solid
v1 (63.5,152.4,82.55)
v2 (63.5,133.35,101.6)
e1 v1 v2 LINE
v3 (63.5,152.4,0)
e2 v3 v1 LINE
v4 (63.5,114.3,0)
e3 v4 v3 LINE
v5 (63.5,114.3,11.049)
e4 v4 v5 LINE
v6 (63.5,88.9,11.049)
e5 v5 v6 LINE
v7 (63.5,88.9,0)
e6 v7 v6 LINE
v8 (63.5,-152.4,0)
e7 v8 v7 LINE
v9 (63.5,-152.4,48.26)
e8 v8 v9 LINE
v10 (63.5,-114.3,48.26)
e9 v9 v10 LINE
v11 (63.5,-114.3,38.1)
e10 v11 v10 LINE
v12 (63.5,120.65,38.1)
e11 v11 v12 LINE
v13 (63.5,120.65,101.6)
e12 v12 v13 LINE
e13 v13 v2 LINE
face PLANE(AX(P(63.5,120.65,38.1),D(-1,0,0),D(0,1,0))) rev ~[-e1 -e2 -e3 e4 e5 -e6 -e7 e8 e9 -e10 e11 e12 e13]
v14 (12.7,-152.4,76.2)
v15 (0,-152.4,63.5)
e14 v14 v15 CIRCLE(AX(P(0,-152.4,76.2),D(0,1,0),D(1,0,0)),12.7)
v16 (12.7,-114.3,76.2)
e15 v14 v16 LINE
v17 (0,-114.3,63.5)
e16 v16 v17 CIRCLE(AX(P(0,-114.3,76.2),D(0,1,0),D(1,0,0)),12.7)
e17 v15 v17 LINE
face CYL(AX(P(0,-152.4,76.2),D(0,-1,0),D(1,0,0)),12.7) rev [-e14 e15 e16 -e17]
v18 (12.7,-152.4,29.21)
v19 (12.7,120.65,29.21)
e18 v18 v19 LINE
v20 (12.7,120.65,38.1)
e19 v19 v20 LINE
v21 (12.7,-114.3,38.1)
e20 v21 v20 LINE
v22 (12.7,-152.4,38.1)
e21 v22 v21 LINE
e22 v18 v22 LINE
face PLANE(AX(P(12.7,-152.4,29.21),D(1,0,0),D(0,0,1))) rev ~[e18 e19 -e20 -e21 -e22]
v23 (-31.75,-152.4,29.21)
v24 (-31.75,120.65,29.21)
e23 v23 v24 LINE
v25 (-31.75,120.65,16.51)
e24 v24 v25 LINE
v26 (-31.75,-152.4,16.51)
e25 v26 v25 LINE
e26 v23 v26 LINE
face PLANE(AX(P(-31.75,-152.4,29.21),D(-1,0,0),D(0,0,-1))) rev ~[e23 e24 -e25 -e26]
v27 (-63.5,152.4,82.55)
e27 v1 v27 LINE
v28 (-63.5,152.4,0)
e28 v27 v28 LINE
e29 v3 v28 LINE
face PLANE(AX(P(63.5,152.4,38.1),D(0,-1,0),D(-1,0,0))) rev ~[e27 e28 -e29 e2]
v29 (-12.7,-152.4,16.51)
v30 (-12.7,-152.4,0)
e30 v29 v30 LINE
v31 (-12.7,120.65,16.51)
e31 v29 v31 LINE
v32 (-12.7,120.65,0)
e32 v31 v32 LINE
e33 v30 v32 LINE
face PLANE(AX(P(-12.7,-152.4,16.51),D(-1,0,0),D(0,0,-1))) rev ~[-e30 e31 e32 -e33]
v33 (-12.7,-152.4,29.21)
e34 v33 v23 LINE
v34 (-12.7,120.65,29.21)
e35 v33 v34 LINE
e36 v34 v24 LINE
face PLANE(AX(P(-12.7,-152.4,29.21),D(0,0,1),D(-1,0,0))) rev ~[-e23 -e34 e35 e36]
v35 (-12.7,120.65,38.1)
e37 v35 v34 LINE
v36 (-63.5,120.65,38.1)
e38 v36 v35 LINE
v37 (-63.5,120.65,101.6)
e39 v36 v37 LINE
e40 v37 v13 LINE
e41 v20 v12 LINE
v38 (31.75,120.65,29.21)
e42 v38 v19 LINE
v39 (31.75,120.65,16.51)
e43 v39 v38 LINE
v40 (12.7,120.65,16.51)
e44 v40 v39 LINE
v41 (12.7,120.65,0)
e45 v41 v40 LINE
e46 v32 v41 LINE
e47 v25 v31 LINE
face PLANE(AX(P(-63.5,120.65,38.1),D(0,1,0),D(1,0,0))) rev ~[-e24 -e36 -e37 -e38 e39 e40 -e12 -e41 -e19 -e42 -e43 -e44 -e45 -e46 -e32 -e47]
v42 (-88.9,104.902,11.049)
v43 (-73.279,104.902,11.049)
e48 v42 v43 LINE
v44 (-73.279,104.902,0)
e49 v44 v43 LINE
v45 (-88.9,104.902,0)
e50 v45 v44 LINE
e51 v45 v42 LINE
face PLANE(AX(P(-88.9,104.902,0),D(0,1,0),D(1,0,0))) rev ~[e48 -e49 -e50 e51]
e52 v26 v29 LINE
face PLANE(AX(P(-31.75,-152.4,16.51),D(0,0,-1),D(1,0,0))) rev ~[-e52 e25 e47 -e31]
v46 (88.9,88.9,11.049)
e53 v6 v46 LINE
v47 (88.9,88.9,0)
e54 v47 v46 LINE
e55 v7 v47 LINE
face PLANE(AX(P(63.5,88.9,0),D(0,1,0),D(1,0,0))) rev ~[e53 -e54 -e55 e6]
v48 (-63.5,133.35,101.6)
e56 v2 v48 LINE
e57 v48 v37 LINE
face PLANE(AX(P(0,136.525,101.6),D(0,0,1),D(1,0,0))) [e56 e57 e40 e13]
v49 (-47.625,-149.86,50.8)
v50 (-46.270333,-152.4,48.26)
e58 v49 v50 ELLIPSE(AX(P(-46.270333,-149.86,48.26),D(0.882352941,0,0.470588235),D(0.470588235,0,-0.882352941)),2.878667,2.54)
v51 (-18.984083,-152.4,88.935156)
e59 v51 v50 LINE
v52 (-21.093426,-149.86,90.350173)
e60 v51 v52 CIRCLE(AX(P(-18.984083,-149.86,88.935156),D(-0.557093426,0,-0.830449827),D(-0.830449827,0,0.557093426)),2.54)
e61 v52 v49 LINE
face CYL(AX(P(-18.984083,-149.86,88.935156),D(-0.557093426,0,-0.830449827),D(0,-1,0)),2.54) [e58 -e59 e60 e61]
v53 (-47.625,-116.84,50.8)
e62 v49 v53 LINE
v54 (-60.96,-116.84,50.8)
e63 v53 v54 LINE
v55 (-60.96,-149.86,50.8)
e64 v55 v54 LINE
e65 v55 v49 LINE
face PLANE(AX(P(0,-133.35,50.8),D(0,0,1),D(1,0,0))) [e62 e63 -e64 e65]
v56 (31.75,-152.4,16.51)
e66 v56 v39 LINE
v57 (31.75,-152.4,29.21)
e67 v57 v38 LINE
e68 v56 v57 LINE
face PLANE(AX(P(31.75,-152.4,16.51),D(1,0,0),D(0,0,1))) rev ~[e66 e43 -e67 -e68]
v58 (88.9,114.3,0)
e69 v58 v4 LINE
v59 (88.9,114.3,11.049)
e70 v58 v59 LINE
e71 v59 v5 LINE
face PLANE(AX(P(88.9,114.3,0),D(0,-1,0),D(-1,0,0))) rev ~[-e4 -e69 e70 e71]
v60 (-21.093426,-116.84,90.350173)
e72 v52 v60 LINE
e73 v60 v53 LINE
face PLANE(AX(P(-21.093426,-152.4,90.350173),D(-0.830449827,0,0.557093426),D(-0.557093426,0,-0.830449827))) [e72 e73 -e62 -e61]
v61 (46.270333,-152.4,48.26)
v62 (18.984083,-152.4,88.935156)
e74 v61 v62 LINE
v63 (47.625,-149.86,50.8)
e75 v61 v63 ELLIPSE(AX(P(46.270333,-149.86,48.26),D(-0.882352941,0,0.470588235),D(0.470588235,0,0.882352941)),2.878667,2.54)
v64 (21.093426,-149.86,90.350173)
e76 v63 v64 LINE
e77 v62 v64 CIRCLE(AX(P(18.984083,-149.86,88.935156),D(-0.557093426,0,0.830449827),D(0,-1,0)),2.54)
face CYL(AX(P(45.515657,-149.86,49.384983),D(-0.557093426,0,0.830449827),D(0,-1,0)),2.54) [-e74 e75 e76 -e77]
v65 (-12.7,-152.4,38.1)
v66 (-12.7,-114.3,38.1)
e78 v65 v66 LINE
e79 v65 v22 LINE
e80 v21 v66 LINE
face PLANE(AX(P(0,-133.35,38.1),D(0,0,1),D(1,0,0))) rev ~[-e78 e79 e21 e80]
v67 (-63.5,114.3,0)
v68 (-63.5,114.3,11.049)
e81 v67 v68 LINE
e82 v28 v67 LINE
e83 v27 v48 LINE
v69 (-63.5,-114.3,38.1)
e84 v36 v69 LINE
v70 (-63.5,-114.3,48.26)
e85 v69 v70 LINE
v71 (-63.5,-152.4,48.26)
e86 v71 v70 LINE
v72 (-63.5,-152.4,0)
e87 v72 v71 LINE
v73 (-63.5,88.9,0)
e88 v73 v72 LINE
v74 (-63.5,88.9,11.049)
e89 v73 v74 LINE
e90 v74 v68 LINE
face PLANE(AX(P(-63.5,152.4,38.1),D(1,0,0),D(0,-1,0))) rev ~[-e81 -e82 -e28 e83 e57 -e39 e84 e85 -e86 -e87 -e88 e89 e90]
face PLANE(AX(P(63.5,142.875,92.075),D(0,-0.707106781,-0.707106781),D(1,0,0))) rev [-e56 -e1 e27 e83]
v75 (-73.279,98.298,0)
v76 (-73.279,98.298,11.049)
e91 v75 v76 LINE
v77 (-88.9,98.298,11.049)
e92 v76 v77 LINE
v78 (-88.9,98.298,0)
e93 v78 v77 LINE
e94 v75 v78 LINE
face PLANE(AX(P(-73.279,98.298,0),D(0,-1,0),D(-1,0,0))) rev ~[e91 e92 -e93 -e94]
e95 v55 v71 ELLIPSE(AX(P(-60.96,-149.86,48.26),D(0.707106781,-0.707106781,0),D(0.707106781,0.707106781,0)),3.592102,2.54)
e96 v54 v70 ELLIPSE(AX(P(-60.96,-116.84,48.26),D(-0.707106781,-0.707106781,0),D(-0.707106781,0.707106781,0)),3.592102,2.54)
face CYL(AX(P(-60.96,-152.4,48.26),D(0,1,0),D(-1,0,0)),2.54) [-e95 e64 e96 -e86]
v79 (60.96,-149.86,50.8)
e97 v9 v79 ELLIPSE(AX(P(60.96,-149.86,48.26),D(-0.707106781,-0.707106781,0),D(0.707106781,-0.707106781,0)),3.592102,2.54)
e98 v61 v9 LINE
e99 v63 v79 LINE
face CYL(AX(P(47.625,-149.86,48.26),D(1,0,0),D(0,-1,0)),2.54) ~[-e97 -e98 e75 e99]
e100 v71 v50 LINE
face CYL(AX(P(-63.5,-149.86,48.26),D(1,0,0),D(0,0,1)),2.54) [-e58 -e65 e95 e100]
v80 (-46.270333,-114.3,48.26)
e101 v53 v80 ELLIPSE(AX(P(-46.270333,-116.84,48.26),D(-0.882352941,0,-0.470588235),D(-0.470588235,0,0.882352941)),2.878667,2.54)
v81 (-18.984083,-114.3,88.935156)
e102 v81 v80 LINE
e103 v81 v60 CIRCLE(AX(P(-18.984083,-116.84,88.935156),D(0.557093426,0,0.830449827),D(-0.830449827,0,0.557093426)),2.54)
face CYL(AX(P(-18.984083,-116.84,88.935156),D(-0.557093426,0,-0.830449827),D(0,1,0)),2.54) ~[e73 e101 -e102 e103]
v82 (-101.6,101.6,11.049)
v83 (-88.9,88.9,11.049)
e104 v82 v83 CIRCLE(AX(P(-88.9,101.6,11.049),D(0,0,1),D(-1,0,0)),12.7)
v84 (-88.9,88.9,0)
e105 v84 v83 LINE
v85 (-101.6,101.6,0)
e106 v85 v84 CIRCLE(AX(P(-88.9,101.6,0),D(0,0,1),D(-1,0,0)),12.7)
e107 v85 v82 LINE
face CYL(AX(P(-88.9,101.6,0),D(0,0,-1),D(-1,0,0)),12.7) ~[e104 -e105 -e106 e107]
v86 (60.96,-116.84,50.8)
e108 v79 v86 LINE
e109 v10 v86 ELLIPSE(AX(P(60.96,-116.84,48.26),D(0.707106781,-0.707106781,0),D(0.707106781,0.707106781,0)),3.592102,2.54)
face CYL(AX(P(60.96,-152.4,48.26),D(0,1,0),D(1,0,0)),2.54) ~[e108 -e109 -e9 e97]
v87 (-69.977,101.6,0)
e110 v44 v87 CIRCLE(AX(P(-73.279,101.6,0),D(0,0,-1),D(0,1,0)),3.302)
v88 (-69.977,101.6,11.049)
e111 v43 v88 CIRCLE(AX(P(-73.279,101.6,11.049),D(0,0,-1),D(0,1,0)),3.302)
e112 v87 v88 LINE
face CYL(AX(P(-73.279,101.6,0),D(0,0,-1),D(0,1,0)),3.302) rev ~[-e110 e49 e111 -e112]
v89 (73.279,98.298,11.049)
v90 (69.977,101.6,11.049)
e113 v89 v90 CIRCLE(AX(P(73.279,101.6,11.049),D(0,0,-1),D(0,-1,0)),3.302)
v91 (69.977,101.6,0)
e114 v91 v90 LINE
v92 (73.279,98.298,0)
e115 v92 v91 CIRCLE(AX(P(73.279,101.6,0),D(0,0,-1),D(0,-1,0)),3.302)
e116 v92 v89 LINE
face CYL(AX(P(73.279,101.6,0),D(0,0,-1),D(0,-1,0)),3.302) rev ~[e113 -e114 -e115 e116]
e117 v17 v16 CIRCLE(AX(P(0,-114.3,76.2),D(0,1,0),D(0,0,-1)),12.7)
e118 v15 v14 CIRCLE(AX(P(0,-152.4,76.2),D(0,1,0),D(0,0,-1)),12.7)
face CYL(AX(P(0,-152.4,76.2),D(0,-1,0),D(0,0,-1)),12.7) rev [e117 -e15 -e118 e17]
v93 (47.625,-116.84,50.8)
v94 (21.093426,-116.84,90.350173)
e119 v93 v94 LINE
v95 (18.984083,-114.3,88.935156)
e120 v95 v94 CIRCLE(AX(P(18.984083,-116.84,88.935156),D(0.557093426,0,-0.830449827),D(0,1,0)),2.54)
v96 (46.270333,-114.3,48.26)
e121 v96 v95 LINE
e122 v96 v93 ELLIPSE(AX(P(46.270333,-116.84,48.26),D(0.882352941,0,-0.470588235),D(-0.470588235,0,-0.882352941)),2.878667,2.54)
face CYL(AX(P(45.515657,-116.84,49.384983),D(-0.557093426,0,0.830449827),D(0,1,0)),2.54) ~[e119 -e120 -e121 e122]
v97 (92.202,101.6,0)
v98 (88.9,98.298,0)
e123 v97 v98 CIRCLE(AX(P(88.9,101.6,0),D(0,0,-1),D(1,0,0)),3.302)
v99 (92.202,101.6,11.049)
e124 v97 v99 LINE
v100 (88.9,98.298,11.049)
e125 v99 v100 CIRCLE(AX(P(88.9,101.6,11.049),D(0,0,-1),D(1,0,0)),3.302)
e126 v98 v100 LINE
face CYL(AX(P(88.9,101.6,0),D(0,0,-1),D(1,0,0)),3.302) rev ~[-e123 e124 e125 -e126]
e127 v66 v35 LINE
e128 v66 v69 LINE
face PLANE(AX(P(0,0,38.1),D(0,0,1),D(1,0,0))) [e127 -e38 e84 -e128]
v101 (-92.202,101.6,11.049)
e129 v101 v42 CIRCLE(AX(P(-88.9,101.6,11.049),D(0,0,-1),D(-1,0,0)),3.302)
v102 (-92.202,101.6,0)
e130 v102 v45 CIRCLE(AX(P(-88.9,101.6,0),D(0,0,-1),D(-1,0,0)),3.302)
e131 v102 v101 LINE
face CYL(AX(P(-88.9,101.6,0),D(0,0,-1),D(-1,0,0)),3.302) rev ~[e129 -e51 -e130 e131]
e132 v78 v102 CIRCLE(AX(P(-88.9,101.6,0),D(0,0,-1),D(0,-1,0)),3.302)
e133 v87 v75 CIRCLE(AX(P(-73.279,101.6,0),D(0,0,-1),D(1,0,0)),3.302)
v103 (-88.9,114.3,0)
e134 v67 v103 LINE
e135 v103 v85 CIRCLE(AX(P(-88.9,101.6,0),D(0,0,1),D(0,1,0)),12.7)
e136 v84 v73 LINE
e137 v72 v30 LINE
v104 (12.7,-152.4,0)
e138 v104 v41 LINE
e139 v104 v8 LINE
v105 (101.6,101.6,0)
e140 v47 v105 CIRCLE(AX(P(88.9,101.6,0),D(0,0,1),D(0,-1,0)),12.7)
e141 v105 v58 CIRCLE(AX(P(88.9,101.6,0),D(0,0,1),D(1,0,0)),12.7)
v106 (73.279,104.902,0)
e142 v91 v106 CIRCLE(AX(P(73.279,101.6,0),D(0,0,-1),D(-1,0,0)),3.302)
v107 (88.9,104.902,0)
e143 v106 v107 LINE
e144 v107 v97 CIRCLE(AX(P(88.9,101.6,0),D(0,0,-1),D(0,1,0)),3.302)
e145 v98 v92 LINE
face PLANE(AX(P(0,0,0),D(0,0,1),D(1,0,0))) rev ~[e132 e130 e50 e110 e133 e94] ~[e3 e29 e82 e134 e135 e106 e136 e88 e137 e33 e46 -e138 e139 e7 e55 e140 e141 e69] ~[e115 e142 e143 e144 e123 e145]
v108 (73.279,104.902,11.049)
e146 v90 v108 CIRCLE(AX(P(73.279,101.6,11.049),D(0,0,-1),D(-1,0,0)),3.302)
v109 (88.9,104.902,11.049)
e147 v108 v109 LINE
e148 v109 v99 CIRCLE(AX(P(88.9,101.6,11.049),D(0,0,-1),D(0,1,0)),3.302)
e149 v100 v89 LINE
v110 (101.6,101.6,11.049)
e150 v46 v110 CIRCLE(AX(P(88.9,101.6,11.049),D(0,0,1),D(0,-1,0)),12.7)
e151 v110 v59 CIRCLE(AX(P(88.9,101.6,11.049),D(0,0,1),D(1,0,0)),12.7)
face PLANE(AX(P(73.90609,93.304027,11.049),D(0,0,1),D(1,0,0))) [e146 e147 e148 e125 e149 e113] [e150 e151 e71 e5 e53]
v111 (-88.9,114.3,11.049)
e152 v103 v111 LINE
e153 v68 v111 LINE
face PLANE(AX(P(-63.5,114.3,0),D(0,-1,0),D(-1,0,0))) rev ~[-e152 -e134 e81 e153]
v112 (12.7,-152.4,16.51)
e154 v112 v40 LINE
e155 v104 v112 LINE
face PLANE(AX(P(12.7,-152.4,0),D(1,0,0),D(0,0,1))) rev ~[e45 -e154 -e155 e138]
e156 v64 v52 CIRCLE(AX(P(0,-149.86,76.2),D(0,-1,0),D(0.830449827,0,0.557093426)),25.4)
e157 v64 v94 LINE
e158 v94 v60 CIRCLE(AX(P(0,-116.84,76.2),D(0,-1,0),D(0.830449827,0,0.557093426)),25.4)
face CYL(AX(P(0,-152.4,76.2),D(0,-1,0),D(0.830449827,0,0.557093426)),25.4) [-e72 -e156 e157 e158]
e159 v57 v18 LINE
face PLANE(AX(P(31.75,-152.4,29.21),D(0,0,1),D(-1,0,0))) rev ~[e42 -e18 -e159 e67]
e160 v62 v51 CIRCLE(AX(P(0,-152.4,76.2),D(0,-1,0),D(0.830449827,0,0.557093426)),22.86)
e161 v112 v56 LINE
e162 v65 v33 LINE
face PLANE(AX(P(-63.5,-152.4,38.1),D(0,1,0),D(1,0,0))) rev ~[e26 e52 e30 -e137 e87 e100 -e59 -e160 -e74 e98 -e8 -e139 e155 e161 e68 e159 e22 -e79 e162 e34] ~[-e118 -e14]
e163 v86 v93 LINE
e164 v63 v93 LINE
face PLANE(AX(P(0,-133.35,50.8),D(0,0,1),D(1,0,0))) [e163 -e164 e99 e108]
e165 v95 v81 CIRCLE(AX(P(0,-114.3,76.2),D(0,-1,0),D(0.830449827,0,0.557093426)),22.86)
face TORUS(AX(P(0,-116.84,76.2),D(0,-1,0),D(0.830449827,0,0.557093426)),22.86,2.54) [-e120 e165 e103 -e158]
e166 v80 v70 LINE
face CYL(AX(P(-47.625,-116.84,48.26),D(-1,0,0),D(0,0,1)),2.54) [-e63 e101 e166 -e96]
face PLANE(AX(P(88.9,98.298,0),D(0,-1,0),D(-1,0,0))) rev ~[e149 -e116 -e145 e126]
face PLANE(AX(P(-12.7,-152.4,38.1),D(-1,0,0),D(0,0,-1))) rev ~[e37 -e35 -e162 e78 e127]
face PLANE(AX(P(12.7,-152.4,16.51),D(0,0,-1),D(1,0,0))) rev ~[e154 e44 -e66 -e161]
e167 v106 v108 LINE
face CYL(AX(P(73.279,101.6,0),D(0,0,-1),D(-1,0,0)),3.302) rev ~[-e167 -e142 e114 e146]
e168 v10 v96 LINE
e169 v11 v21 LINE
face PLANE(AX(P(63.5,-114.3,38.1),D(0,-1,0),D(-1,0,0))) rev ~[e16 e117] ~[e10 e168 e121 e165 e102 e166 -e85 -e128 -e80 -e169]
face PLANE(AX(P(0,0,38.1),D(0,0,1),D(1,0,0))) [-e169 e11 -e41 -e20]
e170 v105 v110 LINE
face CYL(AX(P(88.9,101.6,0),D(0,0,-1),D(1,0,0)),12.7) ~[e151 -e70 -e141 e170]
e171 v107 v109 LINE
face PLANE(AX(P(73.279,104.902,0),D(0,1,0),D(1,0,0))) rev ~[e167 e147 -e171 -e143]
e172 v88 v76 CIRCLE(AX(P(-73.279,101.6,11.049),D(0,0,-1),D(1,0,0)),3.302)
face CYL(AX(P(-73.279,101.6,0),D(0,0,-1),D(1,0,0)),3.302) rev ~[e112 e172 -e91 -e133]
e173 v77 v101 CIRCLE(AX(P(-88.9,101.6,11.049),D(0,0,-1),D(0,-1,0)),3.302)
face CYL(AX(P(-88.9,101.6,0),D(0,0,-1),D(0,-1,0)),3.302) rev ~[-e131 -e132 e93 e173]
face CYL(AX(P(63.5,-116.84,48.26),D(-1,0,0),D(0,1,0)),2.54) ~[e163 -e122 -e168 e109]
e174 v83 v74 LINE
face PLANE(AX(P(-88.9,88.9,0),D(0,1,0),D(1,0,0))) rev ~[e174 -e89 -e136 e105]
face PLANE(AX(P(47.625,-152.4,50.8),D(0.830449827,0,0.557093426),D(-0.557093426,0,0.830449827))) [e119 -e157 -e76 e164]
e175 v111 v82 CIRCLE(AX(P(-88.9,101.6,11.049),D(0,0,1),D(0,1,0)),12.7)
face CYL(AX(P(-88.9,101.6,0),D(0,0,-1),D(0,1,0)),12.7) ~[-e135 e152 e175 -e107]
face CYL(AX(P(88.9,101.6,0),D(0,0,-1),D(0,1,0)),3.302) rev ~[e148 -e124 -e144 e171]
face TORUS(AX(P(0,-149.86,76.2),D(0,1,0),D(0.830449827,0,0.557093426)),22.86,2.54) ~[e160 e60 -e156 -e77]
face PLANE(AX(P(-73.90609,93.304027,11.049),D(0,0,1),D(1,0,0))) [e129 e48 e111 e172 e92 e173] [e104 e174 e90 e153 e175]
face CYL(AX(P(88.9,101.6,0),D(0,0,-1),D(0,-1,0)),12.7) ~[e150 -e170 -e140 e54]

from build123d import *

# Parameters (mm, degrees)
F1_DEPTH  = 38.1
F3_DEPTH  = 273.05
F4_W      = 25.4
F4_H      = 38.1
F4_W_2    = 50.8
F5_DEPTH  = 12.7
F7_DEPTH  = 38.1
F8_R      = 2.54
F10_DEPTH = 11.049
F11_DEPTH = 11.049
F12_DEPTH = 63.5
F13_SIZE  = 19.05


with BuildPart() as f1:
    # F0 (on Top) → F1 (new body)
    with BuildSketch(Plane.XY):
        Polygon((-63.5, -152.4), (63.5, -152.4), (63.5, 88.9), (63.5, 101.6), (63.5, 114.3), (63.5, 152.4), (-63.5, 152.4), (-63.5, 114.3), (-63.5, 101.6), (-63.5, 88.9), align=None)
    extrude(amount=F1_DEPTH)

    # F2 (on face) → F3 (cut)
    with BuildSketch(Plane.XZ.offset(152.4)):
        Polygon((-12.7, 0), (0, 0), (12.7, 0), (12.7, 16.51), (31.75, 16.51), (31.75, 29.21), (12.7, 29.21), (12.7, 38.1), (-12.7, 38.1), (-12.7, 29.21), (-31.75, 29.21), (-31.75, 16.51), (-12.7, 16.51), align=None)
    extrude(amount=-F3_DEPTH, mode=Mode.SUBTRACT)

    # F4 (on face) → F5 (join)
    with BuildSketch(Plane.XY.offset(38.1)):
        with Locations((0, -133.35)):
            Rectangle(F4_W, F4_H)
        with Locations((-38.1, -133.35)):
            Rectangle(F4_W_2, F4_H)
        with Locations((38.1, -133.35)):
            Rectangle(F4_W_2, F4_H)
    extrude(amount=F5_DEPTH)

    # F6 (on face) → F7 (join)
    with BuildSketch(Plane.XZ.offset(152.4)):
        with BuildLine():
            Line((-47.625, 50.8), (0, 50.8))
            Line((0, 50.8), (47.625, 50.8))
            Line((47.625, 50.8), (21.0934256055, 90.3501730104))
            ThreePointArc((21.0934256055, 90.3501730104), (0, 101.6), (-21.0934256055, 90.3501730104))
            Line((-21.0934256055, 90.3501730104), (-47.625, 50.8))
        make_face()
        with BuildLine():
            ThreePointArc((12.7, 76.2), (8.9802561211, 67.2197438789), (0, 63.5))
            ThreePointArc((0, 63.5), (-8.9802561211, 85.1802561211), (12.7, 76.2))
        make_face(mode=Mode.SUBTRACT)
    extrude(amount=-F7_DEPTH)

    # F8
    f8_edges = [f1.edges().sort_by_distance(p)[0] for p in [
        (-55.5625, -152.4, 50.8),
        (55.5625, -152.4, 50.8),
        (34.359213, -152.4, 70.575087),
        (63.5, -133.35, 50.8),
        (-55.5625, -114.3, 50.8),
        (55.5625, -114.3, 50.8),
        (34.359213, -114.3, 70.575087),
        (0, -152.4, 101.6),
        (0, -114.3, 101.6),
        (-34.359213, -152.4, 70.575087),
        (-34.359213, -114.3, 70.575087),
        (-63.5, -133.35, 50.8),
    ]]
    fillet(f8_edges, radius=F8_R)

    # F0 (on Top) → F10 (join)
    with BuildSketch(Plane.XY):
        with BuildLine():
            Line((-88.9, 88.9), (-63.5, 88.9))
            Line((-63.5, 88.9), (-63.5, 101.6))
            Line((-63.5, 101.6), (-69.977, 101.6))
            ThreePointArc((-69.977, 101.6), (-70.9441334085, 99.2651334085), (-73.279, 98.298))
            Line((-73.279, 98.298), (-76.6367705722, 98.298))
            ThreePointArc((-76.6367705722, 98.298), (-81.1748915865, 91.5196875048), (-88.9, 88.9))
        make_face()
        with BuildLine():
            Line((-69.977, 101.6), (-63.5, 101.6))
            Line((-63.5, 101.6), (-63.5, 114.3))
            Line((-63.5, 114.3), (-88.9, 114.3))
            ThreePointArc((-88.9, 114.3), (-81.1748915865, 111.6803124952), (-76.6367705722, 104.902))
            Line((-76.6367705722, 104.902), (-73.279, 104.902))
            ThreePointArc((-73.279, 104.902), (-70.9441334085, 103.9348665915), (-69.977, 101.6))
        make_face()
        with BuildLine():
            Line((-88.9, 98.298), (-88.9, 88.9))
            ThreePointArc((-88.9, 88.9), (-81.1748915865, 91.5196875048), (-76.6367705722, 98.298))
            Line((-76.6367705722, 98.298), (-88.9, 98.298))
        make_face()
        with BuildLine():
            ThreePointArc((-101.6, 101.6), (-97.8802561211, 92.6197438789), (-88.9, 88.9))
            Line((-88.9, 88.9), (-88.9, 98.298))
            ThreePointArc((-88.9, 98.298), (-91.2348665915, 99.2651334085), (-92.202, 101.6))
            Line((-92.202, 101.6), (-101.6, 101.6))
        make_face()
        with BuildLine():
            ThreePointArc((-88.9, 114.3), (-97.8802561211, 110.5802561211), (-101.6, 101.6))
            Line((-101.6, 101.6), (-92.202, 101.6))
            ThreePointArc((-92.202, 101.6), (-91.2348665915, 103.9348665915), (-88.9, 104.902))
            Line((-88.9, 104.902), (-88.9, 114.3))
        make_face()
        with BuildLine():
            ThreePointArc((-76.6367705722, 104.902), (-81.1748915865, 111.6803124952), (-88.9, 114.3))
            Line((-88.9, 114.3), (-88.9, 104.902))
            Line((-88.9, 104.902), (-76.6367705722, 104.902))
        make_face()
    extrude(amount=F10_DEPTH)

    # F0 (on Top) → F11 (join)
    with BuildSketch(Plane.XY):
        with BuildLine():
            Line((63.5, 101.6), (63.5, 88.9))
            Line((63.5, 88.9), (88.9, 88.9))
            ThreePointArc((88.9, 88.9), (81.1748915865, 91.5196875048), (76.6367705722, 98.298))
            Line((76.6367705722, 98.298), (73.279, 98.298))
            ThreePointArc((73.279, 98.298), (70.9441334085, 99.2651334085), (69.977, 101.6))
            Line((69.977, 101.6), (63.5, 101.6))
        make_face()
        with BuildLine():
            ThreePointArc((76.6367705722, 98.298), (81.1748915865, 91.5196875048), (88.9, 88.9))
            Line((88.9, 88.9), (88.9, 98.298))
            Line((88.9, 98.298), (76.6367705722, 98.298))
        make_face()
        with BuildLine():
            Line((92.202, 101.6), (101.6, 101.6))
            ThreePointArc((101.6, 101.6), (97.8802561211, 110.5802561211), (88.9, 114.3))
            Line((88.9, 114.3), (88.9, 104.902))
            ThreePointArc((88.9, 104.902), (91.2348665915, 103.9348665915), (92.202, 101.6))
        make_face()
        with BuildLine():
            Line((88.9, 98.298), (88.9, 88.9))
            ThreePointArc((88.9, 88.9), (97.8802561211, 92.6197438789), (101.6, 101.6))
            Line((101.6, 101.6), (92.202, 101.6))
            ThreePointArc((92.202, 101.6), (91.2348665915, 99.2651334085), (88.9, 98.298))
        make_face()
        with BuildLine():
            Line((88.9, 104.902), (88.9, 114.3))
            ThreePointArc((88.9, 114.3), (81.1748915865, 111.6803124952), (76.6367705722, 104.902))
            Line((76.6367705722, 104.902), (88.9, 104.902))
        make_face()
        with BuildLine():
            Line((63.5, 114.3), (63.5, 101.6))
            Line((63.5, 101.6), (69.977, 101.6))
            ThreePointArc((69.977, 101.6), (70.9441334085, 103.9348665915), (73.279, 104.902))
            Line((73.279, 104.902), (76.6367705722, 104.902))
            ThreePointArc((76.6367705722, 104.902), (81.1748915865, 111.6803124952), (88.9, 114.3))
            Line((88.9, 114.3), (63.5, 114.3))
        make_face()
    extrude(amount=F11_DEPTH)

    # F9 (on face) → F12 (join)
    with BuildSketch(Plane.XY.offset(38.1)):
        Polygon((-63.5, 120.65), (-12.7, 120.65), (12.7, 120.65), (63.5, 120.65), (63.5, 152.4), (-63.5, 152.4), align=None)
    extrude(amount=F12_DEPTH)

    # F13
    f13_edges = [f1.edges().sort_by_distance(p)[0] for p in [
        (0, 152.4, 101.6),
    ]]
    chamfer(f13_edges, length=F13_SIZE)


solid = f1.part
